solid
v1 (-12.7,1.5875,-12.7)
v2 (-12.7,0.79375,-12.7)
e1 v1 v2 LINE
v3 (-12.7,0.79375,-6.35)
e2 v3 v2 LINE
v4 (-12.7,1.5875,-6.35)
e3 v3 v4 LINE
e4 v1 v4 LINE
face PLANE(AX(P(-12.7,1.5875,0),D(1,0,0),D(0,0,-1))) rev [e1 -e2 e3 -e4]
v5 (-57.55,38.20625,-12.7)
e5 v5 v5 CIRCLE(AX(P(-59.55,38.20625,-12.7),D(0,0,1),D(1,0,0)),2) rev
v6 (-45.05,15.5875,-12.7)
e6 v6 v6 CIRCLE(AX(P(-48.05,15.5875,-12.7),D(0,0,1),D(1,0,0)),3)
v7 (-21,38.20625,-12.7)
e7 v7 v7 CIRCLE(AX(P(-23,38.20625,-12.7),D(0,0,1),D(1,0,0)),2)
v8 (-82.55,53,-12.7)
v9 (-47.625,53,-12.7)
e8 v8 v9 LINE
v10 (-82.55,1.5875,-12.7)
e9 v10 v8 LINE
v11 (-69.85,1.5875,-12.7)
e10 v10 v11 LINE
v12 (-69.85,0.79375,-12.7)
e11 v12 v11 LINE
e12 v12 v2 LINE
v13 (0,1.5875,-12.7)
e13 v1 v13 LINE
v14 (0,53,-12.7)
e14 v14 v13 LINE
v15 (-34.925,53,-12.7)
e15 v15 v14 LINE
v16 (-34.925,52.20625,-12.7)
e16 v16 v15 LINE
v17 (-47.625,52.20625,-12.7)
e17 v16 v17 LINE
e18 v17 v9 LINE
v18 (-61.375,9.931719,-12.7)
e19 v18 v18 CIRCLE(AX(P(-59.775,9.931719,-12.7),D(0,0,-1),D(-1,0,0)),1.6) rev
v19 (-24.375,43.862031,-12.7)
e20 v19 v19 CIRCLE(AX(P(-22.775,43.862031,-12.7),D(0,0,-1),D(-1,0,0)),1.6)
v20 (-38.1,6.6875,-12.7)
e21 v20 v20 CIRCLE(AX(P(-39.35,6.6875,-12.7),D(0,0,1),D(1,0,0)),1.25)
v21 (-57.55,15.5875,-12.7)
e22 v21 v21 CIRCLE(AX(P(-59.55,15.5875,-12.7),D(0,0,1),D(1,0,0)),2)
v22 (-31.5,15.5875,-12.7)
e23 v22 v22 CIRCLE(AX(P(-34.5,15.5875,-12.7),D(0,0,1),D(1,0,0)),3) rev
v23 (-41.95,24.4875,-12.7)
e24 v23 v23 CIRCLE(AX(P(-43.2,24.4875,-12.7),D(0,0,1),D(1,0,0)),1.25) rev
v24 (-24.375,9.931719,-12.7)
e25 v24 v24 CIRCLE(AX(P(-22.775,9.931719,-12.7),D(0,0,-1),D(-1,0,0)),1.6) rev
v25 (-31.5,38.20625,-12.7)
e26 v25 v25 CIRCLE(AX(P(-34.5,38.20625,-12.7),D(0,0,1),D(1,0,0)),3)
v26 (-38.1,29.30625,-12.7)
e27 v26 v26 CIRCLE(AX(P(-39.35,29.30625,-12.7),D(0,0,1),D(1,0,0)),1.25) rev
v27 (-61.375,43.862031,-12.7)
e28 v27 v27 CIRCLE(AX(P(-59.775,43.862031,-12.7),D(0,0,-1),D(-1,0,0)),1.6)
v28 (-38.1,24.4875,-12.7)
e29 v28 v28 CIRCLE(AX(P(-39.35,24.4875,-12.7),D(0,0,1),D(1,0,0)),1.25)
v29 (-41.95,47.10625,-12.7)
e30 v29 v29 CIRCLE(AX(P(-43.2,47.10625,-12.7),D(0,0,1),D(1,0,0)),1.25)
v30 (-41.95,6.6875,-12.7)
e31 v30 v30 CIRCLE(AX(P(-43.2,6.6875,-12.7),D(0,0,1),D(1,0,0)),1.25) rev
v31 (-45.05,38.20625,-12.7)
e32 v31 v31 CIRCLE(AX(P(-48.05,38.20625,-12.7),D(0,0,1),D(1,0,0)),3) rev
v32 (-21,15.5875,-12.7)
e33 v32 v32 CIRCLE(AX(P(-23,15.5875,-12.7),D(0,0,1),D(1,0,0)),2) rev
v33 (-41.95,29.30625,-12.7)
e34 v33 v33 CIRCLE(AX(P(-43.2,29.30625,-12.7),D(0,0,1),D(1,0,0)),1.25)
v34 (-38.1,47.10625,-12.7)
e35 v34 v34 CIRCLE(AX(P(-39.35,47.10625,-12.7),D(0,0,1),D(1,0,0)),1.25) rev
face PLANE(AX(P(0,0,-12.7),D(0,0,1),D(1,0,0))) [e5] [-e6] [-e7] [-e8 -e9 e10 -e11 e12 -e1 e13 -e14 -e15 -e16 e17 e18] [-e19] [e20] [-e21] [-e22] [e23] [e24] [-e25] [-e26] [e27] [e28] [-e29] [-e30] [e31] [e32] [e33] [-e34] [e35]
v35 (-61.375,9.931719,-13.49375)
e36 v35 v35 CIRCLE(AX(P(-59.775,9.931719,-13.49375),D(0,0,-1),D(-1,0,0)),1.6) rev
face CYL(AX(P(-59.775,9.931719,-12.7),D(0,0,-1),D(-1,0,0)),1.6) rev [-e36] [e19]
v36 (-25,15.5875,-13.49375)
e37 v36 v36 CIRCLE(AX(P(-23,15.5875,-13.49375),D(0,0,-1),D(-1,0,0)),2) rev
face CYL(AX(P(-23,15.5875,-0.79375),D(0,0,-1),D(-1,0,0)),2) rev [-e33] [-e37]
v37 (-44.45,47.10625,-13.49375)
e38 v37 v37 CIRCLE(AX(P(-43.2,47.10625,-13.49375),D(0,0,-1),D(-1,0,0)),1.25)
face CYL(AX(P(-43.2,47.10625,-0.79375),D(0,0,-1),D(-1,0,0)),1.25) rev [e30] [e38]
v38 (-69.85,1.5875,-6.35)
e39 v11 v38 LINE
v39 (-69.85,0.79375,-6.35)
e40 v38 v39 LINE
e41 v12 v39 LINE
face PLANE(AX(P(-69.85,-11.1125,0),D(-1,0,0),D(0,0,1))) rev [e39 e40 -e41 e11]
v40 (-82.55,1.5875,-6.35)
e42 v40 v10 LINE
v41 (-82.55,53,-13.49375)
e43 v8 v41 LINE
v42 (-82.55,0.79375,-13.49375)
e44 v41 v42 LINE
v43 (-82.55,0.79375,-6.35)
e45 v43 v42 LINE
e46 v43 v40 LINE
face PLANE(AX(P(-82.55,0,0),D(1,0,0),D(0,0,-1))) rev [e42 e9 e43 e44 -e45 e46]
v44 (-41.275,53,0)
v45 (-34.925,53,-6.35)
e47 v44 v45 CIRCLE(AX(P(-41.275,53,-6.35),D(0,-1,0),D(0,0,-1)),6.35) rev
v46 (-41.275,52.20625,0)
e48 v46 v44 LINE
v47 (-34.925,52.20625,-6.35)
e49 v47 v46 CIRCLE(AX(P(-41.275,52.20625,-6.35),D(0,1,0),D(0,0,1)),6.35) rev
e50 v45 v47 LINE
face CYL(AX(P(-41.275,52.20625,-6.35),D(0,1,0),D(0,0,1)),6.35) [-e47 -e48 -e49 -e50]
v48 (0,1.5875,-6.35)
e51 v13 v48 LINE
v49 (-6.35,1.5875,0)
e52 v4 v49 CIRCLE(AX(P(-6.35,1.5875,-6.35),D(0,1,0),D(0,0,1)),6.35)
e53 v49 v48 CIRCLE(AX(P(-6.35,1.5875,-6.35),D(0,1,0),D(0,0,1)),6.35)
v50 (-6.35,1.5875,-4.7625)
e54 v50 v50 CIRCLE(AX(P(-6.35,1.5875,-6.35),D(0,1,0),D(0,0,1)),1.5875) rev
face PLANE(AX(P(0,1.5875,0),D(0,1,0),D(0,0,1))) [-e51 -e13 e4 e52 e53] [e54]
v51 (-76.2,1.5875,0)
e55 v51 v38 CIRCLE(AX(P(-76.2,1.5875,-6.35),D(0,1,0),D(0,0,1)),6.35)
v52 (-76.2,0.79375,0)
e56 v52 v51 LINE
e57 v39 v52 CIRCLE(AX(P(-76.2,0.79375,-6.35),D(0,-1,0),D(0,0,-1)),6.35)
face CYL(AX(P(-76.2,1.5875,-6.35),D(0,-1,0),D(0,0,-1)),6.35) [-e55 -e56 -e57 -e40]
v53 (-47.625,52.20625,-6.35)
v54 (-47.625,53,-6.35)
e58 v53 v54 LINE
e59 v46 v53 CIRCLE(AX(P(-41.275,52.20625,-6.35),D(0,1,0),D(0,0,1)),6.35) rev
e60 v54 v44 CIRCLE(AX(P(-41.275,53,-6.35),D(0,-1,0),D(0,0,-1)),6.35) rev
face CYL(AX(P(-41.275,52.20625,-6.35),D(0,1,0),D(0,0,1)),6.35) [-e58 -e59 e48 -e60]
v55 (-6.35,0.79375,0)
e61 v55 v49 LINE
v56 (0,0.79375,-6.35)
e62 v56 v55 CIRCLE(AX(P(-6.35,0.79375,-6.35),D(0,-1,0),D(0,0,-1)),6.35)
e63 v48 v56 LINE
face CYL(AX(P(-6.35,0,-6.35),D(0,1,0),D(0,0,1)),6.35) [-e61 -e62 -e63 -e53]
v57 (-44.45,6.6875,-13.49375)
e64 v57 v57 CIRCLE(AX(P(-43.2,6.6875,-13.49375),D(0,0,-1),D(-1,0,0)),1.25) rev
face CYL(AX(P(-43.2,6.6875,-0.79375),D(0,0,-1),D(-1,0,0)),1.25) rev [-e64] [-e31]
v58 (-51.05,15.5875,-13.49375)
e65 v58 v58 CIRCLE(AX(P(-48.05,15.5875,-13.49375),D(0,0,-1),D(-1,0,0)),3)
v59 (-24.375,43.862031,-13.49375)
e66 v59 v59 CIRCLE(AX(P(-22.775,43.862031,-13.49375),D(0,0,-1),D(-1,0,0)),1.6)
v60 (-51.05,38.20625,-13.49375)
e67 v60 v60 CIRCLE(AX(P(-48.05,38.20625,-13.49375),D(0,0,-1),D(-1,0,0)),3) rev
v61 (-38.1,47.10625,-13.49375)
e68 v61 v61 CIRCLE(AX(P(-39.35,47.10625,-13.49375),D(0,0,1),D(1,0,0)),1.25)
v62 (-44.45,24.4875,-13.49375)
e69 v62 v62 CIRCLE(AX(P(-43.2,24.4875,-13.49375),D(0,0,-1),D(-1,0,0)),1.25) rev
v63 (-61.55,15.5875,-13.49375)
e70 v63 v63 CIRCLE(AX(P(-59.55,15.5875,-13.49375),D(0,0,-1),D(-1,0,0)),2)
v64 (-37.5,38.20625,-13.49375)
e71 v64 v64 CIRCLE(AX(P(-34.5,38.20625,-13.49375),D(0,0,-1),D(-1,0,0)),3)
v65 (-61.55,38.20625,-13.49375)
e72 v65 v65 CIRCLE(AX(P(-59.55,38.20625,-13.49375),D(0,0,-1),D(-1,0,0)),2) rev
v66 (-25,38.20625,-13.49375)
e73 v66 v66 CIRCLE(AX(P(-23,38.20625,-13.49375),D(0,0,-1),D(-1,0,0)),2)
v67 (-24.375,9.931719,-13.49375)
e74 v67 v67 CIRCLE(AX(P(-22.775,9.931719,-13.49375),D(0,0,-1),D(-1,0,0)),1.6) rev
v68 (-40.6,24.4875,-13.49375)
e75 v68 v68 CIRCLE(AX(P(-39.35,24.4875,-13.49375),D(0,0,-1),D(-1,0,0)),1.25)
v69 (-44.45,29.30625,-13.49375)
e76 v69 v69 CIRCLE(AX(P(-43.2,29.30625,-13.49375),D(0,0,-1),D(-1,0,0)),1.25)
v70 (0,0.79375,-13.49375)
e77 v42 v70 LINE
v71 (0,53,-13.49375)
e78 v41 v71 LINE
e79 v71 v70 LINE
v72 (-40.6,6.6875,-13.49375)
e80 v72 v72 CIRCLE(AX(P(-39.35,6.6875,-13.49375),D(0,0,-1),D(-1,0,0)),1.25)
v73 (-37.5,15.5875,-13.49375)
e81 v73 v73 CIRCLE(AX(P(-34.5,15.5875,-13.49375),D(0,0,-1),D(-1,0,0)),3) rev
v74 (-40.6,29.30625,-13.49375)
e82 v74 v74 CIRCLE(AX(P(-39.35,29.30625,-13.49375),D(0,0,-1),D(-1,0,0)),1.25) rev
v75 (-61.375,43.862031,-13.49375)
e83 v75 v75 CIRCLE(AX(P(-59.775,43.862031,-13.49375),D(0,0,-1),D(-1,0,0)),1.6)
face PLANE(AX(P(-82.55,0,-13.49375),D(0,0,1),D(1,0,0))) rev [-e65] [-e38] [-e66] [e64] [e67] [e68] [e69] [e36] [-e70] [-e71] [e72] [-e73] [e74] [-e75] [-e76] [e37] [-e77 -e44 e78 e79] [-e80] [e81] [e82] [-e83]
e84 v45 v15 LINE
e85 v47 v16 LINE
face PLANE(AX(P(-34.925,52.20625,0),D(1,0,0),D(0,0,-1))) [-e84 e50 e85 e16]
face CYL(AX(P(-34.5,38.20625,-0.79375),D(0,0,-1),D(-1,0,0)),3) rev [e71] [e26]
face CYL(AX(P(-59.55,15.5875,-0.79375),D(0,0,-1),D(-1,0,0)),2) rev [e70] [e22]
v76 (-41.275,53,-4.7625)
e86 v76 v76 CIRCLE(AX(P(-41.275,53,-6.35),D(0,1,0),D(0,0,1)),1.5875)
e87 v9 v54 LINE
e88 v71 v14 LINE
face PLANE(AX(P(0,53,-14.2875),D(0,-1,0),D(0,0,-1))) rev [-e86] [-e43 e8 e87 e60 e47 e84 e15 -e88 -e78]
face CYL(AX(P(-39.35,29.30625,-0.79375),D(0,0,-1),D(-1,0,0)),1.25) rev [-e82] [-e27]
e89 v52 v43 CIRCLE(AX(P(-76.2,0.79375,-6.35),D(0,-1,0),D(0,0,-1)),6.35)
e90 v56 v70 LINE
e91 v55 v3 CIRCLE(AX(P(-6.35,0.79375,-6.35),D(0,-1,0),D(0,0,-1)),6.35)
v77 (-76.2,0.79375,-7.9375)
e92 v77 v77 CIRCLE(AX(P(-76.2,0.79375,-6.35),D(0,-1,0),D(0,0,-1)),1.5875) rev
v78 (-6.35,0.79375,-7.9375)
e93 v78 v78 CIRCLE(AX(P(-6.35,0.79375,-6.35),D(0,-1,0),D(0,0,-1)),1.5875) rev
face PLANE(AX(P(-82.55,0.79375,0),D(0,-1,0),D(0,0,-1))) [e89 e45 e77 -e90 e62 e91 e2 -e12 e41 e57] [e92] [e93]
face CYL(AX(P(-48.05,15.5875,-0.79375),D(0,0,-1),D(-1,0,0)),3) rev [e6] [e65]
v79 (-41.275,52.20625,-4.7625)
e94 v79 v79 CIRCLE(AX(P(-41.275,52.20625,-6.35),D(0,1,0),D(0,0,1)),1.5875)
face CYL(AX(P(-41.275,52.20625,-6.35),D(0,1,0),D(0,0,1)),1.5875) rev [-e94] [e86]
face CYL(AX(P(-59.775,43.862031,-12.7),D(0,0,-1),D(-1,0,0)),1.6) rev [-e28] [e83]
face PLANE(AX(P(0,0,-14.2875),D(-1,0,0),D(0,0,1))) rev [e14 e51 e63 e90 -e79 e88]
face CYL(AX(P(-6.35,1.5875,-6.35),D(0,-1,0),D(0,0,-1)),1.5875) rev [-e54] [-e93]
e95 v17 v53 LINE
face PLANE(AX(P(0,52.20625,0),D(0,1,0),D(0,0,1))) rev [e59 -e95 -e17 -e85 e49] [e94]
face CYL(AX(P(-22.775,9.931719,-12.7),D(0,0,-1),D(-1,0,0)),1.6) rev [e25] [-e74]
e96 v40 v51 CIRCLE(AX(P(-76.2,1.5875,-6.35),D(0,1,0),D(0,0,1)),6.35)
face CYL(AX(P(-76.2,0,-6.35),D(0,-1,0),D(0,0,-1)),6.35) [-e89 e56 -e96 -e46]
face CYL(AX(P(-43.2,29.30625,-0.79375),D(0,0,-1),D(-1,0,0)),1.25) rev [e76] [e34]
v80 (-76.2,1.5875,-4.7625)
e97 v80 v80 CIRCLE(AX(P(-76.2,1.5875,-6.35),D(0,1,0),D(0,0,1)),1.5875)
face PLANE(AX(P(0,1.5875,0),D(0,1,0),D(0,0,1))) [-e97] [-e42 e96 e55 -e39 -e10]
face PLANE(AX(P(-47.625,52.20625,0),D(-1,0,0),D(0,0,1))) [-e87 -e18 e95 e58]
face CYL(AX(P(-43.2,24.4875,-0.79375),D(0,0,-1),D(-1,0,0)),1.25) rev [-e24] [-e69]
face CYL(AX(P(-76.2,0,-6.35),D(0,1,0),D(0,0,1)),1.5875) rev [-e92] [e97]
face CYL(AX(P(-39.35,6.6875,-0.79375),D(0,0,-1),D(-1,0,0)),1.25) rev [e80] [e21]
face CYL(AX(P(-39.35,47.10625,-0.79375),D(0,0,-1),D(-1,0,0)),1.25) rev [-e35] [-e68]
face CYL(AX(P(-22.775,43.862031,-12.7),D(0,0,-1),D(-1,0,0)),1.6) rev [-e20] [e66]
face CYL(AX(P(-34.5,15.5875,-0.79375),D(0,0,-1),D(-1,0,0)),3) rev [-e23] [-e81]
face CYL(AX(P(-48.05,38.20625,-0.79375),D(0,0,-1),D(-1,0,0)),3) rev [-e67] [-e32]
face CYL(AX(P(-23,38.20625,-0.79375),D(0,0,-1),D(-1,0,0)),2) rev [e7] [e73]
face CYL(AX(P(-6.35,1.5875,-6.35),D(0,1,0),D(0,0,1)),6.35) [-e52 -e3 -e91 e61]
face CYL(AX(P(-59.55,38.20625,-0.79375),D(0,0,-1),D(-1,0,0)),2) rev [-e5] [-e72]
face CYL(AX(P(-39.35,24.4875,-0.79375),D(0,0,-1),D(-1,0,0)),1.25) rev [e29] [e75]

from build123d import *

# Parameters (mm, degrees)
SKETCH1_R             = 1.5875
BOSS_EXTRUDE1_DEPTH   = 1.5875
SKETCH1_W             = 12.7
SKETCH1_H             = 12.7
BOSS_EXTRUDE1_2_DEPTH = 1.5875
SKETCH2_W             = 69.85
SKETCH2_H             = 53
BOSS_EXTRUDE2_DEPTH   = 1.5875
BOSS_EXTRUDE3_DEPTH   = 1.5875
SKETCH6_W             = 1.5875
SKETCH6_H             = 53
BOSS_EXTRUDE4_DEPTH   = 12.7
SKETCH7_W             = 12.7
SKETCH7_H             = 12.7
CUT_EXTRUDE1_DEPTH    = 12.7
SKETCH10_W            = 13.49375
SKETCH10_H            = 0.79375
CUT_EXTRUDE3_DEPTH    = 100.134429722
SKETCH13_R            = 1.25
SKETCH13_R_2          = 3
SKETCH13_R_3          = 2.000000064
CUT_EXTRUDE4_DEPTH    = 12.7
FILLET1_R             = 6.35
FILLET2_R             = 6.35
SKETCH14_W            = 12.7
SKETCH14_H            = 12.7
SKETCH14_R            = 1.5875
BOSS_EXTRUDE5_DEPTH   = 0.79375
FILLET3_R             = 6.35
SKETCH15_R            = 1.6
CUT_EXTRUDE7_DEPTH    = 0.79375


with BuildPart() as part:
    # Sketch1 → Boss-Extrude1 (new body)
    with BuildSketch(Plane(origin=(0, 0, 0), x_dir=(1, 0, 0), z_dir=(0, 1, 0))):
        Polygon((-12.7, 0), (0, 0), (0, 12.7), (-12.7, 12.7), (-12.7, 6.35), align=None)
        with Locations(Location((-6.35, 6.35, 0), (0, 0, 270))):
            Circle(SKETCH1_R, mode=Mode.SUBTRACT)
    extrude(amount=BOSS_EXTRUDE1_DEPTH)



with BuildPart() as body_2:
    # Sketch1 → Boss-Extrude1 2 (new body)
    with BuildSketch(Plane(origin=(0, 0, 0), x_dir=(1, 0, 0), z_dir=(0, 1, 0))):
        with Locations((-63.5, 6.35)):
            Rectangle(SKETCH1_W, SKETCH1_H)
        with Locations(Location((-63.5, 6.35, 0), (0, 0, 270))):
            Circle(SKETCH1_R, mode=Mode.SUBTRACT)
    extrude(amount=BOSS_EXTRUDE1_2_DEPTH)


with BuildPart() as part_1:
    add(part.part)

    add(body_2.part)  # Boss-Extrude2 merges body 2
    # Sketch2 → Boss-Extrude2 (add)
    with BuildSketch(Plane(origin=(0, 0, -12.7), x_dir=(-1, 0, 0), z_dir=(0, 0, -1))):
        with Locations((34.925, 26.5)):
            Rectangle(SKETCH2_W, SKETCH2_H)
    extrude(amount=BOSS_EXTRUDE2_DEPTH)

    # Sketch5 → Boss-Extrude3 (add)
    with BuildSketch(Plane(origin=(0, 1.5875, 0), x_dir=(1, 0, 0), z_dir=(0, 1, 0))):
        with BuildLine():
            Line((-69.85, 0), (-69.85, 6.35))
            Line((-69.85, 6.35), (-74.6125, 6.35))
            ThreePointArc((-74.6125, 6.35), (-76.2, 4.7625), (-77.7875, 6.35))
            Line((-77.7875, 6.35), (-82.55, 6.35))
            Line((-82.55, 6.35), (-82.55, 0))
            Line((-82.55, 0), (-69.85, 0))
        make_face()
        with BuildLine():
            ThreePointArc((-77.7875, 6.35), (-77.322532015, 7.472532015), (-76.2, 7.9375))
            Line((-76.2, 7.9375), (-76.2, 12.7))
            Line((-76.2, 12.7), (-82.55, 12.7))
            Line((-82.55, 12.7), (-82.55, 6.35))
            Line((-82.55, 6.35), (-77.7875, 6.35))
        make_face()
        with BuildLine():
            Line((-74.6125, 6.35), (-69.85, 6.35))
            Line((-69.85, 6.35), (-69.85, 12.7))
            Line((-69.85, 12.7), (-76.2, 12.7))
            Line((-76.2, 12.7), (-76.2, 7.9375))
            ThreePointArc((-76.2, 7.9375), (-75.077467985, 7.472532015), (-74.6125, 6.35))
        make_face()
    extrude(amount=-BOSS_EXTRUDE3_DEPTH)

    # Sketch6 → Boss-Extrude4 (add)
    with BuildSketch(Plane.ZY.offset(69.85)):
        with Locations((-13.49375, 26.5)):
            Rectangle(SKETCH6_W, SKETCH6_H)
    extrude(amount=BOSS_EXTRUDE4_DEPTH)

    # Sketch7 → Cut-Extrude1 (cut)
    with BuildSketch(Plane(origin=(0, 1.5875, 0), x_dir=(1, 0, 0), z_dir=(0, 1, 0))):
        with Locations((-63.5, 6.35)):
            Rectangle(SKETCH7_W, SKETCH7_H)
    extrude(amount=-CUT_EXTRUDE1_DEPTH, mode=Mode.SUBTRACT)

    # Sketch10 → Cut-Extrude3 (cut, through all)
    with BuildSketch(Plane(origin=(0, 0, 0), x_dir=(0, 0, -1), z_dir=(1, 0, 0))):
        with Locations((6.746875, 0.396875)):
            Rectangle(SKETCH10_W, SKETCH10_H)
        Polygon((13.49375, 0.79375), (13.49375, 0), (14.2875, 0), (14.2875, 53), (13.49375, 53), align=None)
    extrude(amount=-CUT_EXTRUDE3_DEPTH, mode=Mode.SUBTRACT)

    # Sketch13 → Cut-Extrude4 (cut)
    with BuildSketch(Plane(origin=(0, 0, -13.49375), x_dir=(-1, 0, 0), z_dir=(0, 0, -1))):
        with Locations((43.2, 24.48749994)):
            Circle(SKETCH13_R)
        with Locations((43.2, 6.68749994)):
            Circle(SKETCH13_R)
        with Locations((34.5, 15.58749994)):
            Circle(SKETCH13_R_2)
        with Locations((23, 15.58749994)):
            Circle(SKETCH13_R_3)
        with Locations((39.35, 6.68749994)):
            Circle(SKETCH13_R)
        with Locations((39.35, 24.48749994)):
            Circle(SKETCH13_R)
        with Locations((48.05, 15.58749994)):
            Circle(SKETCH13_R_2)
        with Locations((59.55, 15.58749994)):
            Circle(SKETCH13_R_3)
        with Locations((59.55, 38.20625006)):
            Circle(SKETCH13_R_3)
        with Locations((48.05, 38.20625006)):
            Circle(SKETCH13_R_2)
        with Locations((39.35, 29.30625006)):
            Circle(SKETCH13_R)
        with Locations(Location((39.35, 47.10625006, 0), (0, 0, 180))):
            Circle(SKETCH13_R)
        with Locations((23, 38.20625006)):
            Circle(SKETCH13_R_3)
        with Locations((34.5, 38.20625006)):
            Circle(SKETCH13_R_2)
        with Locations((43.2, 47.10625006)):
            Circle(SKETCH13_R)
        with Locations((43.2, 29.30625006)):
            Circle(SKETCH13_R)
    extrude(amount=-CUT_EXTRUDE4_DEPTH, mode=Mode.SUBTRACT)

    # Fillet1
    fillet1_edges = [part_1.edges().sort_by_distance(p)[0] for p in [
        (-12.7, 1.190625, 0),
        (0, 1.190625, 0),
    ]]
    fillet(fillet1_edges, radius=FILLET1_R - 0.0001)  # a hair under: the kernel refuses the full size

    # Fillet2
    fillet2_edges = [part_1.edges().sort_by_distance(p)[0] for p in [
        (-82.55, 1.190625, 0),
        (-69.85, 1.190625, 0),
    ]]
    fillet(fillet2_edges, radius=FILLET2_R - 0.0001)  # a hair under: the kernel refuses the full size

    # Sketch14 → Boss-Extrude5 (add)
    with BuildSketch(Plane(origin=(0, 53, 0), x_dir=(1, 0, 0), z_dir=(0, 1, 0))):
        with Locations((-41.275, 6.35)):
            Rectangle(SKETCH14_W, SKETCH14_H)
        with Locations(Location((-41.275, 6.35, 0), (0, 0, 270))):
            Circle(SKETCH14_R, mode=Mode.SUBTRACT)
    extrude(amount=-BOSS_EXTRUDE5_DEPTH)

    # Fillet3
    fillet3_edges = [part_1.edges().sort_by_distance(p)[0] for p in [
        (-47.625, 52.603125, 0),
        (-34.925, 52.603125, 0),
    ]]
    fillet(fillet3_edges, radius=FILLET3_R - 0.0001)  # a hair under: the kernel refuses the full size

    # Sketch15 → Cut-Extrude7 (cut)
    with BuildSketch(Plane(origin=(0, 0, -13.49375), x_dir=(-1, 0, 0), z_dir=(0, 0, -1))):
        with Locations((22.775, 43.862031033)):
            Circle(SKETCH15_R)
        with Locations((22.775, 9.931718967)):
            Circle(SKETCH15_R)
        with Locations((59.775, 9.931718967)):
            Circle(SKETCH15_R)
        with Locations((59.775, 43.862031033)):
            Circle(SKETCH15_R)
    extrude(amount=-CUT_EXTRUDE7_DEPTH, mode=Mode.SUBTRACT)


solid = part_1.part
